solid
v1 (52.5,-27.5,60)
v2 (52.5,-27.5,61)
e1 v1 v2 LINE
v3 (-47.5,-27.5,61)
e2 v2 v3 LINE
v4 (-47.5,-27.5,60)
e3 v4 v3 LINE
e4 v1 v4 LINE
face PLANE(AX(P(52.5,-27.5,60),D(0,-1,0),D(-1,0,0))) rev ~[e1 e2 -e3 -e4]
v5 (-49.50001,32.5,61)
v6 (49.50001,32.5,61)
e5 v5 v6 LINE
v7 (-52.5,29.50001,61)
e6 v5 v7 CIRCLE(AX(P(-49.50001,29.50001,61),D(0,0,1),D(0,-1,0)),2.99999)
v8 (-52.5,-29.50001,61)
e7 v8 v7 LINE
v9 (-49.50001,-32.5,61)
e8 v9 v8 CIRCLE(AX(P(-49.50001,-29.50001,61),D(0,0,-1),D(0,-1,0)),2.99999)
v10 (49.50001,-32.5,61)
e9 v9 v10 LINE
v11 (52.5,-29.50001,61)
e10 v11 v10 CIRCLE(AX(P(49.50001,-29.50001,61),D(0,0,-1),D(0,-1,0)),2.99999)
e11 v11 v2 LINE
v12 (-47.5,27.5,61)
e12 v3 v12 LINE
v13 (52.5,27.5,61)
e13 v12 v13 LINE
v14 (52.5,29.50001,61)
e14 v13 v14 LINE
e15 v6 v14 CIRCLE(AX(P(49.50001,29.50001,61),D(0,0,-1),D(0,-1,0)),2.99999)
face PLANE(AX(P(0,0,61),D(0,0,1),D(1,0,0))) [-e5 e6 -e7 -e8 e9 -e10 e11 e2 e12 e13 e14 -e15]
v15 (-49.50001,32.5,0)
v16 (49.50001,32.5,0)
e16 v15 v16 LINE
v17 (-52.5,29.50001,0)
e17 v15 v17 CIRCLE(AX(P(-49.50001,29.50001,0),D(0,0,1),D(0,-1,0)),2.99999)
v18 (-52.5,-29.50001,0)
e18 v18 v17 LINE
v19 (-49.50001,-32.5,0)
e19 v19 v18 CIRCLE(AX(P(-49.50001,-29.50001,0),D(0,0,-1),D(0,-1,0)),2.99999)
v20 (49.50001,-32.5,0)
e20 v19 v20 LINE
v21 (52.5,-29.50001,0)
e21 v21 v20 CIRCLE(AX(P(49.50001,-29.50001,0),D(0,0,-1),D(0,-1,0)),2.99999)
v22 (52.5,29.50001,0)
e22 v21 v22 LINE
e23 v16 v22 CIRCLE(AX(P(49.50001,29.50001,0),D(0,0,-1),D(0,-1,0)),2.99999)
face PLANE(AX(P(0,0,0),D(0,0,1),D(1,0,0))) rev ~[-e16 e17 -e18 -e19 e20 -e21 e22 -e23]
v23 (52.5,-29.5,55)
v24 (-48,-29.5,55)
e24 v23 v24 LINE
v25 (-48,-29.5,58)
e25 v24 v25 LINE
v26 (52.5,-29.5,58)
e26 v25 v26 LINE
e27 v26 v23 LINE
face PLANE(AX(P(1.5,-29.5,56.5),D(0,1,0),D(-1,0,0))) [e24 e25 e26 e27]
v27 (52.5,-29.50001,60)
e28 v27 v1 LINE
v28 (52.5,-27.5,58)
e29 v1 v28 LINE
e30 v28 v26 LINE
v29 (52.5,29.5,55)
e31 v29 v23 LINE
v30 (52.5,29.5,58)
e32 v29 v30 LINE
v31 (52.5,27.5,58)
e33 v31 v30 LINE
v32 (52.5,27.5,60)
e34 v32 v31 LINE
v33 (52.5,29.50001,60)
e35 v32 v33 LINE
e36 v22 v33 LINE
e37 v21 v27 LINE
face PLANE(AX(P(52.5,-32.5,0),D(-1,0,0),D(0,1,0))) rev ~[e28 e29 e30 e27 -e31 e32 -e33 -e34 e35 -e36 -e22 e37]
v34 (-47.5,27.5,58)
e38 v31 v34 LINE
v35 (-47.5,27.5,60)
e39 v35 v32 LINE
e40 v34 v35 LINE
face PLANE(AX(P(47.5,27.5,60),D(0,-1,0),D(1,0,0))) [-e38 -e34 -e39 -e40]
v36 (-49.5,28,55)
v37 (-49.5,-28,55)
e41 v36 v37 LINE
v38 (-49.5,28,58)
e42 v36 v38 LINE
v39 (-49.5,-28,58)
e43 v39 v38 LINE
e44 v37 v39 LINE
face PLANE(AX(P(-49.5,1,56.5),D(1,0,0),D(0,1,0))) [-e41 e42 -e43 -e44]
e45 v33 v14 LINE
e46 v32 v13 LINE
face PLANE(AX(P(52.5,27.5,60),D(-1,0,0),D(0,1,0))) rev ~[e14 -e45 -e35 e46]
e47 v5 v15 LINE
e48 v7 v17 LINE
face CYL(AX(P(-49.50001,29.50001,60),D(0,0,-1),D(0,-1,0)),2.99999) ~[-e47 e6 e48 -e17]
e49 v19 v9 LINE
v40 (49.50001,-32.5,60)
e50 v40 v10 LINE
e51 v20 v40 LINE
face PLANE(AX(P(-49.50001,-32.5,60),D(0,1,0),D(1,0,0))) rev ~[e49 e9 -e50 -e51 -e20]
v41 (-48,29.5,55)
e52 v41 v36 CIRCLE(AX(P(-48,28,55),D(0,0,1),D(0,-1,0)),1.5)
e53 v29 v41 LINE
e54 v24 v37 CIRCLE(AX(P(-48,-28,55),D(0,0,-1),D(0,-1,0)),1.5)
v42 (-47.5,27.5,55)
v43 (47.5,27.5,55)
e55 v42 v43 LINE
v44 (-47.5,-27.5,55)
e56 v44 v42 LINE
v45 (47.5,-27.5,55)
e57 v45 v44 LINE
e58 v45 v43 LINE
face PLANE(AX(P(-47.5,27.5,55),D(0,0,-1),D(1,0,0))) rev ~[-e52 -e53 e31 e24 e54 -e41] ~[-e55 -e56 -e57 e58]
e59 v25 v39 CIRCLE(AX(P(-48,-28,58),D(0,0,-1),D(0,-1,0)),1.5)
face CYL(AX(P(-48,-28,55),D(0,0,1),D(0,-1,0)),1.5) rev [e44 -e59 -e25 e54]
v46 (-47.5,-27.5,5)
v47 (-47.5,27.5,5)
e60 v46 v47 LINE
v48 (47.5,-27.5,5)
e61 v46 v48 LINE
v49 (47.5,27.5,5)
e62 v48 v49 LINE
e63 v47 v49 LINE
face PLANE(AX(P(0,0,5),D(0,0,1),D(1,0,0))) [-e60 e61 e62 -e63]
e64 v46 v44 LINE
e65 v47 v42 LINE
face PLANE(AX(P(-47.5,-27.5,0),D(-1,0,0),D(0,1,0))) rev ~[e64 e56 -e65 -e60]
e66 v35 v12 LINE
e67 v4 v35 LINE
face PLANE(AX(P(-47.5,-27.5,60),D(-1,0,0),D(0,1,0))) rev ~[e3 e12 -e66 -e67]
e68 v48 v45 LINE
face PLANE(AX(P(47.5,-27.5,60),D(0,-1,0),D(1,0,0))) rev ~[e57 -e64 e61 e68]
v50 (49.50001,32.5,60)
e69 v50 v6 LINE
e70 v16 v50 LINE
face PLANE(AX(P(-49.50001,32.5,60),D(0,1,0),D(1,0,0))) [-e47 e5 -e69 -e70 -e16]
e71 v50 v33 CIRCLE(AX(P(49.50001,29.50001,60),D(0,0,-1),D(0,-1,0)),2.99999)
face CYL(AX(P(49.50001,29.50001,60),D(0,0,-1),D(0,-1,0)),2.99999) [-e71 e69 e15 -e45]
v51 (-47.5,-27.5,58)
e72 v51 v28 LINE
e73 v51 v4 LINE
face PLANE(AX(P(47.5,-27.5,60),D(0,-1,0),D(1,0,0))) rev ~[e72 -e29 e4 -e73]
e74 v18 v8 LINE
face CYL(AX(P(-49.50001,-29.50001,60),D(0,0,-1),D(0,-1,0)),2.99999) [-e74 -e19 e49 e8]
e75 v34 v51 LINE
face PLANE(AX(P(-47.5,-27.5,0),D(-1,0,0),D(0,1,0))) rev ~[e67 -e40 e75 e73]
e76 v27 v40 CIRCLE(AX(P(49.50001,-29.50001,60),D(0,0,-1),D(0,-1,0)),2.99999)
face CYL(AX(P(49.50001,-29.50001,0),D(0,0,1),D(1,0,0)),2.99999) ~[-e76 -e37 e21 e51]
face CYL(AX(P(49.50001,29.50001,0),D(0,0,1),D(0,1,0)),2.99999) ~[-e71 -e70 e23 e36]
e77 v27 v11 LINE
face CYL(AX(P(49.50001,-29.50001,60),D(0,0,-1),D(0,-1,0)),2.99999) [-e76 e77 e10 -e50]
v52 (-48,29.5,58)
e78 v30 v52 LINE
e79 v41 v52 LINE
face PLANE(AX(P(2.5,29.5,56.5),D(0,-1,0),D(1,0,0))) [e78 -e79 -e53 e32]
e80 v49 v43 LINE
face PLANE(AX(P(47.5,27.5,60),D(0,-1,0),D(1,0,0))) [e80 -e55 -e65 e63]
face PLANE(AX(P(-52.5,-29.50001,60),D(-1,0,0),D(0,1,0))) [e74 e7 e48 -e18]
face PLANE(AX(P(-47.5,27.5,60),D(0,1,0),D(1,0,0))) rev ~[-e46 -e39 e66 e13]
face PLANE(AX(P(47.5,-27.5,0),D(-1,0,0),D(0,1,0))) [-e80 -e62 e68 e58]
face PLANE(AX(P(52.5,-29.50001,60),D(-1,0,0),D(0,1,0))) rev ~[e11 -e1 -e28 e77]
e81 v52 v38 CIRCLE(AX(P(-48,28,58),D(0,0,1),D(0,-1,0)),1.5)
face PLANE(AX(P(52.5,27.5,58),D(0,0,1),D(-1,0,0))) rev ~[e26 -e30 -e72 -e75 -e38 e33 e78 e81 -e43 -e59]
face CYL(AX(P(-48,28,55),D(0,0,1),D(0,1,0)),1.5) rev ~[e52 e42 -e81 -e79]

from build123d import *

# Parameters (mm, degrees)
F0_W      = 105
F0_H      = 65
F0_W_2    = 95
F0_H_2    = 55
F1_DEPTH  = 60
F2_DEPTH  = 5
F3_W      = 5
F3_H      = 55
F4_DEPTH  = 5
F6_DEPTH  = 2
F8_DEPTH  = 2
F10_DEPTH = 2
F11_R     = 2.99999
F12_R     = 1.5
F13_DEPTH = 1


# Not quite as in the source:
# - a fillet or chamfer is up to 0.001 mm smaller than in the source, because OpenCascade refuses the exact size


with BuildPart() as f1:
    # F0 (on Top) → F1 (new body)
    with BuildSketch(Plane.XY):
        Rectangle(F0_W, F0_H)
        Rectangle(F0_W_2, F0_H_2, mode=Mode.SUBTRACT)
    extrude(amount=F1_DEPTH)

    # F0 (on Top) → F2 (join)
    with BuildSketch(Plane.XY):
        Rectangle(F0_W_2, F0_H_2)
    extrude(amount=F2_DEPTH)

    # F3 (on face) → F4 (cut)
    with BuildSketch(Plane.XY.offset(60)):
        with Locations((50, 0)):
            Rectangle(F3_W, F3_H)
    extrude(amount=-F4_DEPTH, mode=Mode.SUBTRACT)

    # F5 (on face) → F6 (cut)
    with BuildSketch(Plane.XZ.offset(-27.5)):
        Polygon((47.5, 55), (52.5, 55), (52.5, 58), (-47.5, 58), (-47.5, 55), align=None)
    extrude(amount=-F6_DEPTH, mode=Mode.SUBTRACT)

    # F7 (on face) → F8 (cut)
    with BuildSketch(Plane.YZ.offset(-47.5)):
        Polygon((27.5, 55), (29.5, 55), (29.5, 58), (27.5, 58), (-27.5, 58), (-27.5, 55), align=None)
    extrude(amount=-F8_DEPTH, mode=Mode.SUBTRACT)

    # F9 (on face) → F10 (cut)
    with BuildSketch(Plane(origin=(0, -27.5, 0), x_dir=(-1, 0, 0), z_dir=(0, 1, 0))):
        Polygon((47.5, 55), (49.5, 55), (49.5, 58), (47.5, 58), (-52.5, 58), (-52.5, 55), (-47.5, 55), align=None)
    extrude(amount=-F10_DEPTH, mode=Mode.SUBTRACT)

    # F11 (radius 3 in the source; OpenCascade refuses exactly that, so slightly less here)
    f11_edges = [f1.edges().sort_by_distance(p)[0] for p in [
        (-52.5, -32.5, 30),
        (-52.5, 32.5, 30),
        (52.5, 32.5, 30),
        (52.5, -32.5, 30),
    ]]
    fillet(f11_edges, radius=F11_R)

    # F12
    f12_edges = [f1.edges().sort_by_distance(p)[0] for p in [
        (-49.5, -29.5, 56.5),
        (-49.5, 29.5, 56.5),
    ]]
    fillet(f12_edges, radius=F12_R)

    # F13 (add): a face of the model
    f13_faces = [f1.faces().sort_by_distance(p)[0] for p in [
        (-51.2650910965, 0, 60),
    ]]
    extrude(f13_faces, amount=F13_DEPTH)


solid = f1.part
